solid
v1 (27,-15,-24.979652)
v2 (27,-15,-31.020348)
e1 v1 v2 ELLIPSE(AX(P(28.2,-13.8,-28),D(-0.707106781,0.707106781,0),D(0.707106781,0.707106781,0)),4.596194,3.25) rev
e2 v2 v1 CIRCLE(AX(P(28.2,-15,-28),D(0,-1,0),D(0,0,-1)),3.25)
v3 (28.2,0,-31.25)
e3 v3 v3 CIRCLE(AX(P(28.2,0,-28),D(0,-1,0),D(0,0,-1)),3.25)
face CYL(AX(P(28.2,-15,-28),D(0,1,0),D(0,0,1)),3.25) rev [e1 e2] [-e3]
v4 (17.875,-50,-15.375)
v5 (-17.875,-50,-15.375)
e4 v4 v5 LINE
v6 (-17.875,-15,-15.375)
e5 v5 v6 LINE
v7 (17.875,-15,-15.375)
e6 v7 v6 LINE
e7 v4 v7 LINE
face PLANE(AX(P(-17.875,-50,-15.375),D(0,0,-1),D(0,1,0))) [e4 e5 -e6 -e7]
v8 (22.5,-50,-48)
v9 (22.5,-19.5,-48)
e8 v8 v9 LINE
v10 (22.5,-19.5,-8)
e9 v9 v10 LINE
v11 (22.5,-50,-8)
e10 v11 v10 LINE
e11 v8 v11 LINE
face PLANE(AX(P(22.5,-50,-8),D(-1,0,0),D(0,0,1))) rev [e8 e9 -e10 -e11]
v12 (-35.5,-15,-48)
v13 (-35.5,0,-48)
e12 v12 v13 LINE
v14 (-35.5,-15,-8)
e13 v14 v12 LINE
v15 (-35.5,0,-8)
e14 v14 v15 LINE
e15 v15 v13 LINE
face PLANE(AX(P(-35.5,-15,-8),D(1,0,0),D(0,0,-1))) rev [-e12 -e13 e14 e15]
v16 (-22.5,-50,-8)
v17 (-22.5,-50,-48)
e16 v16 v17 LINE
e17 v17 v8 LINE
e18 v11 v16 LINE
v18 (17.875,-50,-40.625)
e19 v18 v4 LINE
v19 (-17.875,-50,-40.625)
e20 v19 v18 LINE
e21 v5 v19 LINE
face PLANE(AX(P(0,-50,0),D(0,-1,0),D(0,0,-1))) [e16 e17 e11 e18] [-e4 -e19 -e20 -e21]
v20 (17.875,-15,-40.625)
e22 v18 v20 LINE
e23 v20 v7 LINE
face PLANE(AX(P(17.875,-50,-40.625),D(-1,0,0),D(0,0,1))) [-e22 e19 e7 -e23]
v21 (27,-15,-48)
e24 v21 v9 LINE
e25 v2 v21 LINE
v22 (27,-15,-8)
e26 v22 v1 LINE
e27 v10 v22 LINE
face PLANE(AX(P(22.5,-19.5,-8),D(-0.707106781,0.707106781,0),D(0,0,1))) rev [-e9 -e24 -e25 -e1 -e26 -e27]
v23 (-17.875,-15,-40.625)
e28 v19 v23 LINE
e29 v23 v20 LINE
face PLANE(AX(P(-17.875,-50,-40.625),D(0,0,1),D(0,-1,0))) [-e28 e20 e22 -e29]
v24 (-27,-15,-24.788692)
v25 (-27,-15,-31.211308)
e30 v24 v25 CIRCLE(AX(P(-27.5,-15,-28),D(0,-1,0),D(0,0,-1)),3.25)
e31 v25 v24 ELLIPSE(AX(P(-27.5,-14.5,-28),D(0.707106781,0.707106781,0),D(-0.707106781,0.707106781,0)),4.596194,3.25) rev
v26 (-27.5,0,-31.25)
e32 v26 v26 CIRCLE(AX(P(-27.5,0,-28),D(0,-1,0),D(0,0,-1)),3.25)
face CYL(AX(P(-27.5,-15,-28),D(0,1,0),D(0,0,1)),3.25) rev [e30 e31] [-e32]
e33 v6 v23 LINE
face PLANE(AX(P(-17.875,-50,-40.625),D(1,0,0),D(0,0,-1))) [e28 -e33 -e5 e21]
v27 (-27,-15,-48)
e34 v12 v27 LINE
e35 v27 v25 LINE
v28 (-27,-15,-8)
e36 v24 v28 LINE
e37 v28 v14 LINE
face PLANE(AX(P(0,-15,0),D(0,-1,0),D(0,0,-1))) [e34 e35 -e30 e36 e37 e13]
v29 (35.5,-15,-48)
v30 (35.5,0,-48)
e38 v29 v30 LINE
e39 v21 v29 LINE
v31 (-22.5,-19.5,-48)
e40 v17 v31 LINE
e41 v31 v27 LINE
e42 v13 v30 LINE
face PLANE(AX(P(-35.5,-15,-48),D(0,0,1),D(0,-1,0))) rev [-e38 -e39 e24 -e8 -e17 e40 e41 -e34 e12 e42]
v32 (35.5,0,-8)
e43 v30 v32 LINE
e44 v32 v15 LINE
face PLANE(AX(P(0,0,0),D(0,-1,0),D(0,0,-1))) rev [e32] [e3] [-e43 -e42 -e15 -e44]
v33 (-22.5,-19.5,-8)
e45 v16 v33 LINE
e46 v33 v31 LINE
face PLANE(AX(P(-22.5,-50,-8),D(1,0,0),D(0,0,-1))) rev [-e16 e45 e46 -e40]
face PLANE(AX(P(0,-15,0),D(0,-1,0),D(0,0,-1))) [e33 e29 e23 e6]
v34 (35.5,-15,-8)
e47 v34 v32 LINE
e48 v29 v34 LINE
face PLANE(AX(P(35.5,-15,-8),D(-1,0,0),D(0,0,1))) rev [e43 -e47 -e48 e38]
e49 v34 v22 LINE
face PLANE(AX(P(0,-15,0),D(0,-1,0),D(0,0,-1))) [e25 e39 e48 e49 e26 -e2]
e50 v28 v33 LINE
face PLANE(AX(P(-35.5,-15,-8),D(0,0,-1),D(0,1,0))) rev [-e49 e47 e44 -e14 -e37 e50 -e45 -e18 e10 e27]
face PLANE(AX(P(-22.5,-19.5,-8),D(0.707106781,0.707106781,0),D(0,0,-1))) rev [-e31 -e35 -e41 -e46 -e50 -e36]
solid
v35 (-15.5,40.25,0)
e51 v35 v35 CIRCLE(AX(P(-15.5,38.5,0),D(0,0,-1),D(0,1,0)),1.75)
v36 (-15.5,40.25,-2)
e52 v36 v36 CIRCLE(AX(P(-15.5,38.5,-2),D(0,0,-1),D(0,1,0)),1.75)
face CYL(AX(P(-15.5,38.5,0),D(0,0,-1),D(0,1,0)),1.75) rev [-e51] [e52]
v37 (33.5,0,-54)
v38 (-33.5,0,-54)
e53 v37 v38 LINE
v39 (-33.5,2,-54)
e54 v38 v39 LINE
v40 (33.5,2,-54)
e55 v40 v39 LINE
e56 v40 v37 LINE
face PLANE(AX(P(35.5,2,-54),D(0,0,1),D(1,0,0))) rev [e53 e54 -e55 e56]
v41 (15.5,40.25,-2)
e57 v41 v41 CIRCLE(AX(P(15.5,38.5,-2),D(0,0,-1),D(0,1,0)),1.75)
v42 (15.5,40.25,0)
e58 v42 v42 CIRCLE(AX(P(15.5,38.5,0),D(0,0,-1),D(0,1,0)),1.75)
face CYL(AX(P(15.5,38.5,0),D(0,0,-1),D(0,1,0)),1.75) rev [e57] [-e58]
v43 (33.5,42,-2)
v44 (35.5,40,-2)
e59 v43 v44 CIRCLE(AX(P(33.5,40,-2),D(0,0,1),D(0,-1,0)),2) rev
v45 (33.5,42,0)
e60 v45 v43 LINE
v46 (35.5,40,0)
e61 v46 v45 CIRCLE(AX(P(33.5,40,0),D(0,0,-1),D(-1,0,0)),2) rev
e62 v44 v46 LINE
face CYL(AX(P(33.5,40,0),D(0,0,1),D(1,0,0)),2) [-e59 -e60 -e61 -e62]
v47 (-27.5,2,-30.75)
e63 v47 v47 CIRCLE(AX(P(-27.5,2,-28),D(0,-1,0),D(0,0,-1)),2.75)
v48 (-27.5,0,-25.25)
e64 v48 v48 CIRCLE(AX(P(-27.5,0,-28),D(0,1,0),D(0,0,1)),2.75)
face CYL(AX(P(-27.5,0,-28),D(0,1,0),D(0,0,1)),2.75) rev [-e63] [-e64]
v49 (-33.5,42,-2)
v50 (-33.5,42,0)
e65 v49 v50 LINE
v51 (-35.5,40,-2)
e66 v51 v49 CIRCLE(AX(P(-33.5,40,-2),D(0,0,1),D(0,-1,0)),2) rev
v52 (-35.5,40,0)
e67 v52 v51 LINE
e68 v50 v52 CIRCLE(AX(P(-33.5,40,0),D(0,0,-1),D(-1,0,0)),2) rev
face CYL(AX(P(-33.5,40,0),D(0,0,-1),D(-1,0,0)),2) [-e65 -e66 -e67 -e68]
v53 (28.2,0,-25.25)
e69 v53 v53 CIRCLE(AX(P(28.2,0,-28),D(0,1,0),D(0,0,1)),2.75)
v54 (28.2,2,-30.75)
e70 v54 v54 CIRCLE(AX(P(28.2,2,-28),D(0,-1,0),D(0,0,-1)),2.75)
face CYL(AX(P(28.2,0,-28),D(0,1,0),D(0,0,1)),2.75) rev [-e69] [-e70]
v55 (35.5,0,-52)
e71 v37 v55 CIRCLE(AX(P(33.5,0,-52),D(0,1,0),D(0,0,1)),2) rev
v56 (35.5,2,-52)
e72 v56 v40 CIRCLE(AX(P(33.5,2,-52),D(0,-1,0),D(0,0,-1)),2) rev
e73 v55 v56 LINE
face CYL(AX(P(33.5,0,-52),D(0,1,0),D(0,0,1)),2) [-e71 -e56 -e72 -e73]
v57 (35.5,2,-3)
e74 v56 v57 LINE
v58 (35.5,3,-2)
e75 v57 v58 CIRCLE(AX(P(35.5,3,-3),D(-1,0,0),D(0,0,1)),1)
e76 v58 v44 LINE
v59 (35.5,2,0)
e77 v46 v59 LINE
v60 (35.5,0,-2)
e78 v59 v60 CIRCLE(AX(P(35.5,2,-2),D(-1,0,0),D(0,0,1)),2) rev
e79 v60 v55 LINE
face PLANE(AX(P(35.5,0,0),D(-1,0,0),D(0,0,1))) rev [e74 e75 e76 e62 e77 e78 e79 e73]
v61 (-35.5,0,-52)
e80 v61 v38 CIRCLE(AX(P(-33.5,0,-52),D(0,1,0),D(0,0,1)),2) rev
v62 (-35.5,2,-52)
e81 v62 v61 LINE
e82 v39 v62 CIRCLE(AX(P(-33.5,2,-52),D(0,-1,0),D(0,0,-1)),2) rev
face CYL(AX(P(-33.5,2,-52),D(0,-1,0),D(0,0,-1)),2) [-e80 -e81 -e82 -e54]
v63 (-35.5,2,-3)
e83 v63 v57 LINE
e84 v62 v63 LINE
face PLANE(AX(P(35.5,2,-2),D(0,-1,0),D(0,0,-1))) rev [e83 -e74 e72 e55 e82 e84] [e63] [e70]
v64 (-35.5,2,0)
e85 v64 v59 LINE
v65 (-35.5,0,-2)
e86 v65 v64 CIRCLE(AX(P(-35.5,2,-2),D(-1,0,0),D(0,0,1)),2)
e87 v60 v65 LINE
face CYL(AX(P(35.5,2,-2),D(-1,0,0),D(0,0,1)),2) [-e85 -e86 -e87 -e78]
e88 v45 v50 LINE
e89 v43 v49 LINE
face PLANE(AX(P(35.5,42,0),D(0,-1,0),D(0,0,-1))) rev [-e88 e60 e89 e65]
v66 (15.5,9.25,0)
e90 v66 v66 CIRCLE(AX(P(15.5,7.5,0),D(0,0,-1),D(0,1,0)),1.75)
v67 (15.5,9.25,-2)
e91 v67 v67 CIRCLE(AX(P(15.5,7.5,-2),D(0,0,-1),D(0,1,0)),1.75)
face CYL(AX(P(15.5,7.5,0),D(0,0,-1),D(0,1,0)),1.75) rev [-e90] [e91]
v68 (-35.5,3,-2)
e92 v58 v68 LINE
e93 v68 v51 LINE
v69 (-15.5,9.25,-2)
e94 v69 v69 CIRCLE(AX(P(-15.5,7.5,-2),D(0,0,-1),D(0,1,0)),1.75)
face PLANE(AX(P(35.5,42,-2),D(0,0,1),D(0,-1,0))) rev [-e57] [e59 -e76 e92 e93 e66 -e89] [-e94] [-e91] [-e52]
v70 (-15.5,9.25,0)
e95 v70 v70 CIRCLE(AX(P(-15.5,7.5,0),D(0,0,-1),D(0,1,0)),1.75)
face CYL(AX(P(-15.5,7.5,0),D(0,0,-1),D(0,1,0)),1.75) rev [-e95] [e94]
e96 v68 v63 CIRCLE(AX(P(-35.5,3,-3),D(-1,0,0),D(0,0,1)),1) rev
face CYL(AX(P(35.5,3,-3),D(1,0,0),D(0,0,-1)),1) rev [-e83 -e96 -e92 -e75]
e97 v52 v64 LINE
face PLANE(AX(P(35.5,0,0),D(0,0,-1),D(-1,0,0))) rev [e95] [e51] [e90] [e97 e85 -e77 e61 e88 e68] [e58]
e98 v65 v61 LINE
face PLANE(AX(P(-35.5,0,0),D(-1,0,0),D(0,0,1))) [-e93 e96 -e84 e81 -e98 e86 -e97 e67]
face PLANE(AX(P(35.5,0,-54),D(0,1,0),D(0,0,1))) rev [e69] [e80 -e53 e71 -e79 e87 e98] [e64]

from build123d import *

# Parameters (mm, degrees)
RESSALTO_EXTRUS_O1_DEPTH   = 35.5
CORTE_EXTRUS_O1_DEPTH      = 77.001644719
CORTE_EXTRUS_O1_DEPTH_BACK = 77.001644719
ESBO_O2_R                  = 2.75
FILETE1_R                  = 2
FILETE2_R                  = 1
ESBO_O3_R                  = 1.75
CORTE_EXTRUS_O2_DEPTH      = 76.685203309
ESBO_O4_W                  = 71
ESBO_O4_H                  = 40
ESBO_O4_R                  = 3.25
RESSALTO_EXTRUS_O2_DEPTH   = 15
ESBO_O5_W                  = 45
ESBO_O5_H                  = 40
ESBO_O5_W_2                = 35.75
ESBO_O5_H_2                = 25.25
RESSALTO_EXTRUS_O3_DEPTH   = 35
CHANFRO1_SIZE              = 4.5


with BuildPart() as part:
    # Esboço1 → Ressalto-extrusão1 (new, symmetric)
    with BuildSketch(Plane(origin=(0, 0, 0), x_dir=(0, 0, -1), z_dir=(1, 0, 0))):
        Polygon((0, 0), (0, 42), (2, 42), (2, 2), (54, 2), (54, 0), align=None)
    extrude(amount=RESSALTO_EXTRUS_O1_DEPTH, both=True)

    # Esboço2 → Corte-extrusão1 (cut, two sides: drawn at the far end of the back side and taken through both)
    with BuildSketch(Plane(origin=(0, 2, 0), x_dir=(1, 0, 0), z_dir=(0, 1, 0)).offset(-CORTE_EXTRUS_O1_DEPTH_BACK)):
        with Locations(Location((-27.5, 28, 0), (0, 0, 270))):
            Circle(ESBO_O2_R)
        with Locations(Location((28.2, 28, 0), (0, 0, 270))):
            Circle(ESBO_O2_R)
    extrude(amount=CORTE_EXTRUS_O1_DEPTH + CORTE_EXTRUS_O1_DEPTH_BACK, mode=Mode.SUBTRACT)

    # Filete1
    filete1_edges = [part.edges().sort_by_distance(p)[0] for p in [
        (0, 0, 0),
        (35.5, 42, -1),
        (-35.5, 42, -1),
        (-35.5, 1, -54),
        (35.5, 1, -54),
    ]]
    fillet(filete1_edges, radius=FILETE1_R)

    # Filete2
    filete2_edges = [part.edges().sort_by_distance(p)[0] for p in [
        (0, 2, -2),
    ]]
    fillet(filete2_edges, radius=FILETE2_R)

    # Esboço3 → Corte-extrusão2 (cut, through all)
    with BuildSketch(Plane(origin=(0, 0, -2), x_dir=(-1, 0, 0), z_dir=(0, 0, -1))):
        with Locations(Location((-15.5, 38.5, 0), (0, 0, 90))):
            Circle(ESBO_O3_R)
        with Locations(Location((15.5, 38.5, 0), (0, 0, 90))):
            Circle(ESBO_O3_R)
        with Locations(Location((15.5, 7.5, 0), (0, 0, 90))):
            Circle(ESBO_O3_R)
        with Locations(Location((-15.5, 7.5, 0), (0, 0, 90))):
            Circle(ESBO_O3_R)
    extrude(amount=-CORTE_EXTRUS_O2_DEPTH, mode=Mode.SUBTRACT)


with BuildPart() as body_2:
    # Esboço4 → Ressalto-extrusão2 (new body)
    with BuildSketch(Plane.XZ):
        with Locations((0, -28)):
            Rectangle(ESBO_O4_W, ESBO_O4_H)
        with Locations(Location((-27.5, -28, 0), (0, 0, 270))):
            Circle(ESBO_O4_R, mode=Mode.SUBTRACT)
        with Locations(Location((28.2, -28, 0), (0, 0, 270))):
            Circle(ESBO_O4_R, mode=Mode.SUBTRACT)
    extrude(amount=RESSALTO_EXTRUS_O2_DEPTH)

    # Esboço5 → Ressalto-extrusão3 (add)
    with BuildSketch(Plane.XZ.offset(15)):
        with Locations((0, -28)):
            Rectangle(ESBO_O5_W, ESBO_O5_H)
        with Locations((0, -28)):
            Rectangle(ESBO_O5_W_2, ESBO_O5_H_2, mode=Mode.SUBTRACT)
    extrude(amount=RESSALTO_EXTRUS_O3_DEPTH)

    # Chanfro1
    # the kernel refuses this chamfer: 4.5 mm, written as the material it adds along each edge
    with BuildSketch(Plane(origin=(-22.5, -15, -48), x_dir=(-0.9996219169112966, 0.0274958766105864, 0), z_dir=(0, 0, 1))) as chanfro1_piece_1_section:
        Polygon((CHANFRO1_SIZE * 0.999621916911, CHANFRO1_SIZE * 0.0274958766106), (-CHANFRO1_SIZE * 0.0274958766106, CHANFRO1_SIZE * 0.999621916911), (0, 0), align=None)
    chanfro1_piece_1 = extrude(amount=40, mode=Mode.PRIVATE)
    chanfro1_piece_1 = chanfro1_piece_1 - Plane(origin=(-27.5, -16.515606652, -28), x_dir=(0, 0, -1), z_dir=(0, 1, 0)) * Cylinder(3.25, 98, mode=Mode.PRIVATE)
    add(chanfro1_piece_1)
    with BuildSketch(Plane(origin=(22.5, -15, -8), x_dir=(0.9996219169112966, 0.0274958766105864, 0), z_dir=(0, 0, -1))) as chanfro1_piece_2_section:
        Polygon((CHANFRO1_SIZE * 0.999621916911, CHANFRO1_SIZE * 0.0274958766106), (-CHANFRO1_SIZE * 0.0274958766106, CHANFRO1_SIZE * 0.999621916911), (0, 0), align=None)
    chanfro1_piece_2 = extrude(amount=40, mode=Mode.PRIVATE)
    chanfro1_piece_2 = chanfro1_piece_2 - Plane(origin=(28.2, -16.504829355, -28), x_dir=(0, 0, -1), z_dir=(0, 1, 0)) * Cylinder(3.25, 98, mode=Mode.PRIVATE)
    add(chanfro1_piece_2)


solid = Compound([part.part, body_2.part])
